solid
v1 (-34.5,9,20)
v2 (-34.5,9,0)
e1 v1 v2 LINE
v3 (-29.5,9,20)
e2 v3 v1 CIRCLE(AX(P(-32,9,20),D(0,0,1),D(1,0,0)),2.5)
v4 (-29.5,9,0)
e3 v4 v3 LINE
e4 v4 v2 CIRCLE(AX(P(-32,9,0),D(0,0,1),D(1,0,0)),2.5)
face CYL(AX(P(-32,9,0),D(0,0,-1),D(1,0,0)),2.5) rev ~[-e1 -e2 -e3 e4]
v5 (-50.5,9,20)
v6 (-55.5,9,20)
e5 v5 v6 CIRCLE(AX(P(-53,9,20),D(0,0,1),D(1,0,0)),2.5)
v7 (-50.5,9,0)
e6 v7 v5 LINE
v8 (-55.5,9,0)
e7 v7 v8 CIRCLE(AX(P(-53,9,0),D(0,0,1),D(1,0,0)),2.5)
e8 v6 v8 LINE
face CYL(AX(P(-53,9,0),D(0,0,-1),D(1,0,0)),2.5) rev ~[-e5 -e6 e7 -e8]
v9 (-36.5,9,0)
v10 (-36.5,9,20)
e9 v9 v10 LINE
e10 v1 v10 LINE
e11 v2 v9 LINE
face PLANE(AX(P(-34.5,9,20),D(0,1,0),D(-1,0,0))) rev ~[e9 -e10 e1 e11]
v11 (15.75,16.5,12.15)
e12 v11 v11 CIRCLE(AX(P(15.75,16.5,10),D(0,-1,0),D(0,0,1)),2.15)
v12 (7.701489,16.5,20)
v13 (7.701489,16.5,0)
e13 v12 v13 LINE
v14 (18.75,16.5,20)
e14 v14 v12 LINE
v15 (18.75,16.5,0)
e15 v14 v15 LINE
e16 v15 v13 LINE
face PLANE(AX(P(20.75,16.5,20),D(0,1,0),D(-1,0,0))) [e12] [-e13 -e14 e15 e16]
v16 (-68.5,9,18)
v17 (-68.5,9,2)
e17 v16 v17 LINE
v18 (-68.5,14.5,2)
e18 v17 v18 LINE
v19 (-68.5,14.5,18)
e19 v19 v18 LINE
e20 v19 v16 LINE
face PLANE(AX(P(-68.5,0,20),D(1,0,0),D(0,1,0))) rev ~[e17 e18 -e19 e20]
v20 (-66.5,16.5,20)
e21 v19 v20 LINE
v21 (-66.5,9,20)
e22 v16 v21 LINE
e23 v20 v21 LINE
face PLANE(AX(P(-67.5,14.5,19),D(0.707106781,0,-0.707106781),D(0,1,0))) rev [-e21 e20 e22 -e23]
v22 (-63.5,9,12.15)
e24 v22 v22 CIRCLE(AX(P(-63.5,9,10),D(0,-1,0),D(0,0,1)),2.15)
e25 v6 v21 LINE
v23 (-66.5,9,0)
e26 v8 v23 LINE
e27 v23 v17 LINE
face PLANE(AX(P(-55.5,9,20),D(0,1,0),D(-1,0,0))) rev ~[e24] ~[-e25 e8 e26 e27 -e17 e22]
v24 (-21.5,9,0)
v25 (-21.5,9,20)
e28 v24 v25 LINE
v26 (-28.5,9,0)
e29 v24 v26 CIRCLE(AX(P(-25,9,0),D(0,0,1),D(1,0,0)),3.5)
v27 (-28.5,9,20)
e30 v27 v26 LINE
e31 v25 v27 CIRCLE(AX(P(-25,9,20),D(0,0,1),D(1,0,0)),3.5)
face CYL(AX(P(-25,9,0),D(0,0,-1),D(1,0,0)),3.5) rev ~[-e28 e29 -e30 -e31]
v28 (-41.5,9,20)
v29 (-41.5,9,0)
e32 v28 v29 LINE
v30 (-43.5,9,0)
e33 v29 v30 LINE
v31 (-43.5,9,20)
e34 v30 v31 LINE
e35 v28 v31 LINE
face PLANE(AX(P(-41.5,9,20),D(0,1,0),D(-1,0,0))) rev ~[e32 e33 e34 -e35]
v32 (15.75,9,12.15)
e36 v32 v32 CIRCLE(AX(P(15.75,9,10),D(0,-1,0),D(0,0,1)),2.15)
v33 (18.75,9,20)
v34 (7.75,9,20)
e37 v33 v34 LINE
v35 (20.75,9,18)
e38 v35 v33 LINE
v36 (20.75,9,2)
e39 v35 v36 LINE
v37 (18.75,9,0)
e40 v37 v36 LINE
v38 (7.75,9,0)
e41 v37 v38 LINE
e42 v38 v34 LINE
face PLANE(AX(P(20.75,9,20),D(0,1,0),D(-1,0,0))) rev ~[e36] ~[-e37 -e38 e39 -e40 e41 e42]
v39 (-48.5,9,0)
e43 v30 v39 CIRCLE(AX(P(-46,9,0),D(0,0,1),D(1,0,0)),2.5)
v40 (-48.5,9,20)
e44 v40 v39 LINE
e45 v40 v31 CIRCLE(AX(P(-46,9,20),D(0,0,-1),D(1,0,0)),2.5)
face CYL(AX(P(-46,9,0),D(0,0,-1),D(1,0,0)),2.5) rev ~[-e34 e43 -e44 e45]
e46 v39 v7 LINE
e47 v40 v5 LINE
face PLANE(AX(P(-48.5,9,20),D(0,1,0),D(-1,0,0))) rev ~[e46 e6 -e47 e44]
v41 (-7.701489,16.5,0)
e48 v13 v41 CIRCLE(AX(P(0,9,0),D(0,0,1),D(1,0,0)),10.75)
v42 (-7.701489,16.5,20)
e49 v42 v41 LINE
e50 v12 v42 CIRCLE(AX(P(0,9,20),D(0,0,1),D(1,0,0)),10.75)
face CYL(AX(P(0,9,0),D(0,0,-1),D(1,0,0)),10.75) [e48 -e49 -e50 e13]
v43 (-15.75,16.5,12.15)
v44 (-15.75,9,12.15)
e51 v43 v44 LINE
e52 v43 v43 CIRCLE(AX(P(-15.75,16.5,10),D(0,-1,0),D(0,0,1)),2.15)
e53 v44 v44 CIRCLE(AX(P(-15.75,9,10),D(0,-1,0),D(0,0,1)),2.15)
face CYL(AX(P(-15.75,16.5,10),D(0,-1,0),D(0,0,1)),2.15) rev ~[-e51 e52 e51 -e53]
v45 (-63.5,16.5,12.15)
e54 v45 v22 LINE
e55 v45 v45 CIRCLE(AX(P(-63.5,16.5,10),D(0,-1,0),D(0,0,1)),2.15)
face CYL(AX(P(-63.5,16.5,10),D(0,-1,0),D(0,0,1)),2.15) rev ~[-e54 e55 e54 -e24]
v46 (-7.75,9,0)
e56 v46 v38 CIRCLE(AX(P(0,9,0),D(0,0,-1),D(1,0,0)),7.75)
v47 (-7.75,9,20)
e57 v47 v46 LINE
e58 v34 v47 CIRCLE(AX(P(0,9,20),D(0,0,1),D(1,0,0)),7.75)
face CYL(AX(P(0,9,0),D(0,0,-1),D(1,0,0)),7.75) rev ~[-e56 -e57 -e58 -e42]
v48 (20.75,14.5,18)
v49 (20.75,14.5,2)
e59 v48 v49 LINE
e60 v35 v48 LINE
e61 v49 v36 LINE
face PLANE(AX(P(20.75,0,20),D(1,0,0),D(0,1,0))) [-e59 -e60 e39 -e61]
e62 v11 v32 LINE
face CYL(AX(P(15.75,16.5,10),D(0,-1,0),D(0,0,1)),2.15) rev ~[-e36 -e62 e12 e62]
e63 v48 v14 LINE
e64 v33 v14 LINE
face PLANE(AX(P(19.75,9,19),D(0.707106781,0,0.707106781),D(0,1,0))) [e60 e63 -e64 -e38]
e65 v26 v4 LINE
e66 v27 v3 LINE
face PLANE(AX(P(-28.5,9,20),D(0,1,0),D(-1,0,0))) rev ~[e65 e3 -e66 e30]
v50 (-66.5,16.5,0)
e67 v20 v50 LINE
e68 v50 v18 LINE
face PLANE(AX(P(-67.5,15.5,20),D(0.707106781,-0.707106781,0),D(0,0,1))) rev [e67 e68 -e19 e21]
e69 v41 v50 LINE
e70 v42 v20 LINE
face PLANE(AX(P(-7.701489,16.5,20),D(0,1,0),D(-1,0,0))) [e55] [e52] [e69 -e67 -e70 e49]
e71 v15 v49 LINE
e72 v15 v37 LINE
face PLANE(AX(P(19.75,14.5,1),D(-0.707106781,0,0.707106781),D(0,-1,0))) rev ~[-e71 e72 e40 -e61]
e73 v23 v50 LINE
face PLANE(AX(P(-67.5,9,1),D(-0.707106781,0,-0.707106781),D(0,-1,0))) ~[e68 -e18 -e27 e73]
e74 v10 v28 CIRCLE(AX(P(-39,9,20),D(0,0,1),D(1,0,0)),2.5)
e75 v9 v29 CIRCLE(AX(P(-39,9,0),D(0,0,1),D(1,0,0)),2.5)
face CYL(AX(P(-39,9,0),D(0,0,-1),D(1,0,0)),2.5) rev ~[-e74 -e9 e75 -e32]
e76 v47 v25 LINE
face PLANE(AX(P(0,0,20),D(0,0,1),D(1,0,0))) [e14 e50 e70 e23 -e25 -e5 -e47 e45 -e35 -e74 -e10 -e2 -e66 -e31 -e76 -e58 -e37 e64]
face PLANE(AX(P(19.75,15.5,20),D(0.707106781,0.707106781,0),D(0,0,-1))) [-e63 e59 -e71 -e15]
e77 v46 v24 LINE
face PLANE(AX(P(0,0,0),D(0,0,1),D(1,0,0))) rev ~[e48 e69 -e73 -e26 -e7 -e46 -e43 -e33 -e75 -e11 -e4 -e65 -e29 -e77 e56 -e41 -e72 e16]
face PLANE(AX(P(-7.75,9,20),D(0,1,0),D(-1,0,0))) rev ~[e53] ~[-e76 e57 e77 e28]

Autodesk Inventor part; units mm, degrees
ref_plane "YZ Plane" through (0, 0, 0) normal (1, 0, 0) x (0, 1, 0)
ref_plane "XZ Plane" through (0, 0, 0) normal (0, 1, 0) x (-1, 0, 0)
ref_plane "XY Plane" through (0, 0, 0) normal (0, 0, 1) x (1, 0, 0)
sketch "スケッチ1" plane through (0, 0, 0) normal (0, 0, 1) x (1, 0, 0)
  circle A0 centre (0, 9) radius 7.75
  line L0 (10.75, 0) -> (-58.5, 0)
  line L1 (-58.5, 0) -> (-58.5, 1.25)
  line L2 (-58.5, 1.25) -> (10.75, 1.25)
  line L3 (10.75, 1.25) -> (10.75, 0)
  circle A1 centre (0, 9) radius 10.75
  line L4 (10.75, 1.25) -> (10.75, 15.8822)
  circle A2 centre (-32, 9) radius 2.5
  circle A3 centre (-39, 9) radius 2.5
  circle A4 centre (-25, 9) radius 3.5
  circle A5 centre (-46, 9) radius 2.5
  circle A6 centre (-53, 9) radius 2.5
  circle A7 centre (-53, 9) radius 5.5
  line L5 (-58.5, 1.25) -> (-58.5, 18.7354)
  line L6 (-61.6708, 14.5) -> (12.7388, 14.5)
  point P0 (0, 0)
  point P1 (-9.2365, 14.5)
  point P2 (-58.5, 14.5)
  point P3 (10.75, 14.5)
  point P4 (9.2365, 14.5)
  dimension "d0" = 15.5
  dimension "d1" = 3
  dimension "d2" = 5
  dimension "d3" = 5
  dimension "d4" = 7
  dimension "d5" = 5
  dimension "d7" = 7
  dimension "d8" = 7
  dimension "d9" = 25
  dimension "d10" = 7
  dimension "d11" = 5
  dimension "d12" = 7
  dimension "d13" = 3
  dimension "d16" = 9
extrude "押し出し1" add sketch "スケッチ1" along normal blind 20 contours A0 L6 A1 L2 | A0 L6 A1 | L2 A1 L6 A0 | L2 A1 L0 | L6 L4 A1 | A1 L0 L1 L2 | L2 L5 A7 A5 L6 A1 | A1 L4 L2 | L2 L3 L0 A1 | A7 A5 | A7 L5 L6 picked at (-49.0972, 10.8197)
sketch "スケッチ3" plane through (0, 0, 20) normal (0, 0, 1) x (1, 0, 0)
  line L0 (-9.2365, 14.5) -> (-58.5, 14.5) projected
  line L1 (-58.5, 14.5) -> (-58.5, 0) projected
  line L2 (-58.5, 0) -> (10.75, 0) projected
  line L3 (10.75, 0) -> (10.75, 14.5) projected
  line L4 (10.75, 14.5) -> (9.2365, 14.5) projected
  arc A0 (9.2365, 14.5) -> (-9.2365, 14.5) centre (0, 9) ccw projected
  circle A1 centre (0, 9) radius 7.75 projected
  circle A2 centre (-53, 9) radius 2.5 projected
  circle A3 centre (-25, 9) radius 3.5 projected
  circle A4 centre (-39, 9) radius 2.5 projected
  circle A5 centre (-32, 9) radius 2.5 projected
  circle A6 centre (-46, 9) radius 2.5 projected
  line L5 (-58.5, 14.5) -> (-58.5, 0) projected
  line L6 (-58.5, 0) -> (-68.5, 0)
  line L7 (-68.5, 0) -> (-68.5, 14.5)
  line L8 (-68.5, 14.5) -> (-58.5, 14.5)
  line L9 (-58.5, 14.5) -> (-58.5, 0)
  line L10 (10.75, 0) -> (20.75, 0)
  line L11 (20.75, 0) -> (20.75, 14.5)
  line L12 (20.75, 14.5) -> (10.75, 14.5)
  line L13 (10.75, 14.5) -> (10.75, 0)
  point P0 (0, 0)
  dimension "d17" = 10
  dimension "d18" = 10
extrude "押し出し2" add sketch "スケッチ3" against normal up to surface (20 mm away) contours L1 L6 L7 L8 | L12 L11 L10 L3
sketch "スケッチ4" plane through (0, 0, 20) normal (0, 0, 1) x (1, 0, 0)
  line L0 (-9.2365, 14.5) -> (-68.5, 14.5) projected
  line L1 (-68.5, 14.5) -> (-68.5, 0) projected
  line L2 (-68.5, 0) -> (20.75, 0) projected
  line L3 (20.75, 0) -> (20.75, 14.5) projected
  line L4 (20.75, 14.5) -> (9.2365, 14.5) projected
  arc A0 (9.2365, 14.5) -> (-9.2365, 14.5) centre (0, 9) ccw projected
  circle A1 centre (0, 9) radius 7.75 projected
  circle A2 centre (-53, 9) radius 2.5 projected
  circle A3 centre (-25, 9) radius 3.5 projected
  circle A4 centre (-39, 9) radius 2.5 projected
  circle A5 centre (-32, 9) radius 2.5 projected
  circle A6 centre (-46, 9) radius 2.5 projected
  line L5 (-68.5, 0) -> (-68.5, 14.5) projected
  line L6 (20.75, 0) -> (20.75, 14.5) projected
  line L7 (-68.5, 0) -> (20.75, 0)
  line L8 (20.75, 0) -> (20.75, 9)
  line L9 (20.75, 9) -> (-68.5, 9)
  line L10 (-68.5, 9) -> (-68.5, 0)
  point P0 (0, 0)
  point P1 (-55.5, 9)
  point P2 (-68.5, 9)
  point P3 (7.75, 9)
  point P4 (-7.75, 9)
  point P5 (-28.5, 9)
  point P6 (-21.5, 9)
  point P7 (-29.5, 9)
  point P8 (-34.5, 9)
  point P9 (-36.5, 9)
  point P10 (-41.5, 9)
  point P11 (-43.5, 9)
  point P12 (-48.5, 9)
  point P13 (-50.5, 9)
extrude "押し出し3" cut sketch "スケッチ4" against normal through all contours L9 A2 A6 A4 A5 A3 A1 L3 L2 L1 | L9 A3 | A3 L9
sketch "スケッチ6" plane through (0, 0, 20) normal (0, 0, 1) x (1, 0, 0)
  line L0 (-43.5, 9) -> (-41.5, 9) projected
  arc A0 (-36.5, 9) -> (-41.5, 9) centre (-39, 9) ccw projected
  line L1 (-36.5, 9) -> (-34.5, 9) projected
  arc A1 (-29.5, 9) -> (-34.5, 9) centre (-32, 9) ccw projected
  line L2 (-29.5, 9) -> (-28.5, 9) projected
  arc A2 (-21.5, 9) -> (-28.5, 9) centre (-25, 9) ccw projected
  line L3 (-21.5, 9) -> (-7.75, 9) projected
  arc A3 (7.75, 9) -> (-7.75, 9) centre (0, 9) ccw projected
  line L4 (7.75, 9) -> (20.75, 9) projected
  line L5 (20.75, 9) -> (20.75, 14.5) projected
  line L6 (20.75, 14.5) -> (9.2365, 14.5) projected
  arc A4 (9.2365, 14.5) -> (-9.2365, 14.5) centre (0, 9) ccw projected
  line L7 (-9.2365, 14.5) -> (-68.5, 14.5) projected
  line L8 (-68.5, 14.5) -> (-68.5, 9) projected
  line L9 (-68.5, 9) -> (-55.5, 9) projected
  arc A5 (-50.5, 9) -> (-55.5, 9) centre (-53, 9) ccw projected
  line L10 (-50.5, 9) -> (-48.5, 9) projected
  arc A6 (-43.5, 9) -> (-48.5, 9) centre (-46, 9) ccw projected
  line L11 (-68.5, 14.5) -> (20.75, 14.5)
  line L12 (20.75, 14.5) -> (20.75, 16.5)
  line L13 (20.75, 16.5) -> (-68.5, 16.5)
  line L14 (-68.5, 16.5) -> (-68.5, 14.5)
  point P0 (0, 0)
  point P1 (7.7015, 16.5)
  point P2 (-7.7015, 16.5)
  dimension "d33" = 2
extrude "押し出し4" add sketch "スケッチ6" against normal up to surface (20 mm away) contours L14 L13 A4 L7 | L13 L12 L6 A4
sketch "スケッチ7" plane through (7.7015, 16.5, 20) normal (0, 1, 0) x (1, 0, 0)
  line L0 (0, 20) -> (13.0485, 20) projected
  line L1 (0, 0) -> (0, 20) projected
  line L2 (13.0485, 0) -> (0, 0) projected
  line L3 (13.0485, 0) -> (13.0485, 20) projected
  line L4 (-76.2015, 20) -> (-15.4029, 20) projected
  line L5 (-76.2015, 0) -> (-76.2015, 20) projected
  line L6 (-15.4029, 0) -> (-76.2015, 0) projected
  line L7 (-15.4029, 20) -> (-15.4029, 0) projected
  point P0 (-7.7015, 20)
  point P1 (8.0485, 10)
  point P2 (-23.4515, 10)
  point P3 (-71.2015, 10)
  dimension "d36" = 5
  dimension "d37" = 10
  dimension "d38" = 10
  dimension "d39" = 15.75
  dimension "d40" = 5
hole "穴2" at (15.75, 16.5, 10) at (-15.75, 16.5, 10) at (-63.5, 16.5, 10) direction (0, -1, 0) diameter 4.3 end through all
chamfer "面取り1" distance 2 angle 45 2 edges at (20.75, 16.5, 10) (-68.5, 16.5, 10)
chamfer "面取り2" distance 2 angle 45 4 edges at (20.75, 11.75, 0) (20.75, 11.75, 20) (-68.5, 11.75, 0) (-68.5, 11.75, 20)
properties part number "C_Unit_Cable_Holder_A"
